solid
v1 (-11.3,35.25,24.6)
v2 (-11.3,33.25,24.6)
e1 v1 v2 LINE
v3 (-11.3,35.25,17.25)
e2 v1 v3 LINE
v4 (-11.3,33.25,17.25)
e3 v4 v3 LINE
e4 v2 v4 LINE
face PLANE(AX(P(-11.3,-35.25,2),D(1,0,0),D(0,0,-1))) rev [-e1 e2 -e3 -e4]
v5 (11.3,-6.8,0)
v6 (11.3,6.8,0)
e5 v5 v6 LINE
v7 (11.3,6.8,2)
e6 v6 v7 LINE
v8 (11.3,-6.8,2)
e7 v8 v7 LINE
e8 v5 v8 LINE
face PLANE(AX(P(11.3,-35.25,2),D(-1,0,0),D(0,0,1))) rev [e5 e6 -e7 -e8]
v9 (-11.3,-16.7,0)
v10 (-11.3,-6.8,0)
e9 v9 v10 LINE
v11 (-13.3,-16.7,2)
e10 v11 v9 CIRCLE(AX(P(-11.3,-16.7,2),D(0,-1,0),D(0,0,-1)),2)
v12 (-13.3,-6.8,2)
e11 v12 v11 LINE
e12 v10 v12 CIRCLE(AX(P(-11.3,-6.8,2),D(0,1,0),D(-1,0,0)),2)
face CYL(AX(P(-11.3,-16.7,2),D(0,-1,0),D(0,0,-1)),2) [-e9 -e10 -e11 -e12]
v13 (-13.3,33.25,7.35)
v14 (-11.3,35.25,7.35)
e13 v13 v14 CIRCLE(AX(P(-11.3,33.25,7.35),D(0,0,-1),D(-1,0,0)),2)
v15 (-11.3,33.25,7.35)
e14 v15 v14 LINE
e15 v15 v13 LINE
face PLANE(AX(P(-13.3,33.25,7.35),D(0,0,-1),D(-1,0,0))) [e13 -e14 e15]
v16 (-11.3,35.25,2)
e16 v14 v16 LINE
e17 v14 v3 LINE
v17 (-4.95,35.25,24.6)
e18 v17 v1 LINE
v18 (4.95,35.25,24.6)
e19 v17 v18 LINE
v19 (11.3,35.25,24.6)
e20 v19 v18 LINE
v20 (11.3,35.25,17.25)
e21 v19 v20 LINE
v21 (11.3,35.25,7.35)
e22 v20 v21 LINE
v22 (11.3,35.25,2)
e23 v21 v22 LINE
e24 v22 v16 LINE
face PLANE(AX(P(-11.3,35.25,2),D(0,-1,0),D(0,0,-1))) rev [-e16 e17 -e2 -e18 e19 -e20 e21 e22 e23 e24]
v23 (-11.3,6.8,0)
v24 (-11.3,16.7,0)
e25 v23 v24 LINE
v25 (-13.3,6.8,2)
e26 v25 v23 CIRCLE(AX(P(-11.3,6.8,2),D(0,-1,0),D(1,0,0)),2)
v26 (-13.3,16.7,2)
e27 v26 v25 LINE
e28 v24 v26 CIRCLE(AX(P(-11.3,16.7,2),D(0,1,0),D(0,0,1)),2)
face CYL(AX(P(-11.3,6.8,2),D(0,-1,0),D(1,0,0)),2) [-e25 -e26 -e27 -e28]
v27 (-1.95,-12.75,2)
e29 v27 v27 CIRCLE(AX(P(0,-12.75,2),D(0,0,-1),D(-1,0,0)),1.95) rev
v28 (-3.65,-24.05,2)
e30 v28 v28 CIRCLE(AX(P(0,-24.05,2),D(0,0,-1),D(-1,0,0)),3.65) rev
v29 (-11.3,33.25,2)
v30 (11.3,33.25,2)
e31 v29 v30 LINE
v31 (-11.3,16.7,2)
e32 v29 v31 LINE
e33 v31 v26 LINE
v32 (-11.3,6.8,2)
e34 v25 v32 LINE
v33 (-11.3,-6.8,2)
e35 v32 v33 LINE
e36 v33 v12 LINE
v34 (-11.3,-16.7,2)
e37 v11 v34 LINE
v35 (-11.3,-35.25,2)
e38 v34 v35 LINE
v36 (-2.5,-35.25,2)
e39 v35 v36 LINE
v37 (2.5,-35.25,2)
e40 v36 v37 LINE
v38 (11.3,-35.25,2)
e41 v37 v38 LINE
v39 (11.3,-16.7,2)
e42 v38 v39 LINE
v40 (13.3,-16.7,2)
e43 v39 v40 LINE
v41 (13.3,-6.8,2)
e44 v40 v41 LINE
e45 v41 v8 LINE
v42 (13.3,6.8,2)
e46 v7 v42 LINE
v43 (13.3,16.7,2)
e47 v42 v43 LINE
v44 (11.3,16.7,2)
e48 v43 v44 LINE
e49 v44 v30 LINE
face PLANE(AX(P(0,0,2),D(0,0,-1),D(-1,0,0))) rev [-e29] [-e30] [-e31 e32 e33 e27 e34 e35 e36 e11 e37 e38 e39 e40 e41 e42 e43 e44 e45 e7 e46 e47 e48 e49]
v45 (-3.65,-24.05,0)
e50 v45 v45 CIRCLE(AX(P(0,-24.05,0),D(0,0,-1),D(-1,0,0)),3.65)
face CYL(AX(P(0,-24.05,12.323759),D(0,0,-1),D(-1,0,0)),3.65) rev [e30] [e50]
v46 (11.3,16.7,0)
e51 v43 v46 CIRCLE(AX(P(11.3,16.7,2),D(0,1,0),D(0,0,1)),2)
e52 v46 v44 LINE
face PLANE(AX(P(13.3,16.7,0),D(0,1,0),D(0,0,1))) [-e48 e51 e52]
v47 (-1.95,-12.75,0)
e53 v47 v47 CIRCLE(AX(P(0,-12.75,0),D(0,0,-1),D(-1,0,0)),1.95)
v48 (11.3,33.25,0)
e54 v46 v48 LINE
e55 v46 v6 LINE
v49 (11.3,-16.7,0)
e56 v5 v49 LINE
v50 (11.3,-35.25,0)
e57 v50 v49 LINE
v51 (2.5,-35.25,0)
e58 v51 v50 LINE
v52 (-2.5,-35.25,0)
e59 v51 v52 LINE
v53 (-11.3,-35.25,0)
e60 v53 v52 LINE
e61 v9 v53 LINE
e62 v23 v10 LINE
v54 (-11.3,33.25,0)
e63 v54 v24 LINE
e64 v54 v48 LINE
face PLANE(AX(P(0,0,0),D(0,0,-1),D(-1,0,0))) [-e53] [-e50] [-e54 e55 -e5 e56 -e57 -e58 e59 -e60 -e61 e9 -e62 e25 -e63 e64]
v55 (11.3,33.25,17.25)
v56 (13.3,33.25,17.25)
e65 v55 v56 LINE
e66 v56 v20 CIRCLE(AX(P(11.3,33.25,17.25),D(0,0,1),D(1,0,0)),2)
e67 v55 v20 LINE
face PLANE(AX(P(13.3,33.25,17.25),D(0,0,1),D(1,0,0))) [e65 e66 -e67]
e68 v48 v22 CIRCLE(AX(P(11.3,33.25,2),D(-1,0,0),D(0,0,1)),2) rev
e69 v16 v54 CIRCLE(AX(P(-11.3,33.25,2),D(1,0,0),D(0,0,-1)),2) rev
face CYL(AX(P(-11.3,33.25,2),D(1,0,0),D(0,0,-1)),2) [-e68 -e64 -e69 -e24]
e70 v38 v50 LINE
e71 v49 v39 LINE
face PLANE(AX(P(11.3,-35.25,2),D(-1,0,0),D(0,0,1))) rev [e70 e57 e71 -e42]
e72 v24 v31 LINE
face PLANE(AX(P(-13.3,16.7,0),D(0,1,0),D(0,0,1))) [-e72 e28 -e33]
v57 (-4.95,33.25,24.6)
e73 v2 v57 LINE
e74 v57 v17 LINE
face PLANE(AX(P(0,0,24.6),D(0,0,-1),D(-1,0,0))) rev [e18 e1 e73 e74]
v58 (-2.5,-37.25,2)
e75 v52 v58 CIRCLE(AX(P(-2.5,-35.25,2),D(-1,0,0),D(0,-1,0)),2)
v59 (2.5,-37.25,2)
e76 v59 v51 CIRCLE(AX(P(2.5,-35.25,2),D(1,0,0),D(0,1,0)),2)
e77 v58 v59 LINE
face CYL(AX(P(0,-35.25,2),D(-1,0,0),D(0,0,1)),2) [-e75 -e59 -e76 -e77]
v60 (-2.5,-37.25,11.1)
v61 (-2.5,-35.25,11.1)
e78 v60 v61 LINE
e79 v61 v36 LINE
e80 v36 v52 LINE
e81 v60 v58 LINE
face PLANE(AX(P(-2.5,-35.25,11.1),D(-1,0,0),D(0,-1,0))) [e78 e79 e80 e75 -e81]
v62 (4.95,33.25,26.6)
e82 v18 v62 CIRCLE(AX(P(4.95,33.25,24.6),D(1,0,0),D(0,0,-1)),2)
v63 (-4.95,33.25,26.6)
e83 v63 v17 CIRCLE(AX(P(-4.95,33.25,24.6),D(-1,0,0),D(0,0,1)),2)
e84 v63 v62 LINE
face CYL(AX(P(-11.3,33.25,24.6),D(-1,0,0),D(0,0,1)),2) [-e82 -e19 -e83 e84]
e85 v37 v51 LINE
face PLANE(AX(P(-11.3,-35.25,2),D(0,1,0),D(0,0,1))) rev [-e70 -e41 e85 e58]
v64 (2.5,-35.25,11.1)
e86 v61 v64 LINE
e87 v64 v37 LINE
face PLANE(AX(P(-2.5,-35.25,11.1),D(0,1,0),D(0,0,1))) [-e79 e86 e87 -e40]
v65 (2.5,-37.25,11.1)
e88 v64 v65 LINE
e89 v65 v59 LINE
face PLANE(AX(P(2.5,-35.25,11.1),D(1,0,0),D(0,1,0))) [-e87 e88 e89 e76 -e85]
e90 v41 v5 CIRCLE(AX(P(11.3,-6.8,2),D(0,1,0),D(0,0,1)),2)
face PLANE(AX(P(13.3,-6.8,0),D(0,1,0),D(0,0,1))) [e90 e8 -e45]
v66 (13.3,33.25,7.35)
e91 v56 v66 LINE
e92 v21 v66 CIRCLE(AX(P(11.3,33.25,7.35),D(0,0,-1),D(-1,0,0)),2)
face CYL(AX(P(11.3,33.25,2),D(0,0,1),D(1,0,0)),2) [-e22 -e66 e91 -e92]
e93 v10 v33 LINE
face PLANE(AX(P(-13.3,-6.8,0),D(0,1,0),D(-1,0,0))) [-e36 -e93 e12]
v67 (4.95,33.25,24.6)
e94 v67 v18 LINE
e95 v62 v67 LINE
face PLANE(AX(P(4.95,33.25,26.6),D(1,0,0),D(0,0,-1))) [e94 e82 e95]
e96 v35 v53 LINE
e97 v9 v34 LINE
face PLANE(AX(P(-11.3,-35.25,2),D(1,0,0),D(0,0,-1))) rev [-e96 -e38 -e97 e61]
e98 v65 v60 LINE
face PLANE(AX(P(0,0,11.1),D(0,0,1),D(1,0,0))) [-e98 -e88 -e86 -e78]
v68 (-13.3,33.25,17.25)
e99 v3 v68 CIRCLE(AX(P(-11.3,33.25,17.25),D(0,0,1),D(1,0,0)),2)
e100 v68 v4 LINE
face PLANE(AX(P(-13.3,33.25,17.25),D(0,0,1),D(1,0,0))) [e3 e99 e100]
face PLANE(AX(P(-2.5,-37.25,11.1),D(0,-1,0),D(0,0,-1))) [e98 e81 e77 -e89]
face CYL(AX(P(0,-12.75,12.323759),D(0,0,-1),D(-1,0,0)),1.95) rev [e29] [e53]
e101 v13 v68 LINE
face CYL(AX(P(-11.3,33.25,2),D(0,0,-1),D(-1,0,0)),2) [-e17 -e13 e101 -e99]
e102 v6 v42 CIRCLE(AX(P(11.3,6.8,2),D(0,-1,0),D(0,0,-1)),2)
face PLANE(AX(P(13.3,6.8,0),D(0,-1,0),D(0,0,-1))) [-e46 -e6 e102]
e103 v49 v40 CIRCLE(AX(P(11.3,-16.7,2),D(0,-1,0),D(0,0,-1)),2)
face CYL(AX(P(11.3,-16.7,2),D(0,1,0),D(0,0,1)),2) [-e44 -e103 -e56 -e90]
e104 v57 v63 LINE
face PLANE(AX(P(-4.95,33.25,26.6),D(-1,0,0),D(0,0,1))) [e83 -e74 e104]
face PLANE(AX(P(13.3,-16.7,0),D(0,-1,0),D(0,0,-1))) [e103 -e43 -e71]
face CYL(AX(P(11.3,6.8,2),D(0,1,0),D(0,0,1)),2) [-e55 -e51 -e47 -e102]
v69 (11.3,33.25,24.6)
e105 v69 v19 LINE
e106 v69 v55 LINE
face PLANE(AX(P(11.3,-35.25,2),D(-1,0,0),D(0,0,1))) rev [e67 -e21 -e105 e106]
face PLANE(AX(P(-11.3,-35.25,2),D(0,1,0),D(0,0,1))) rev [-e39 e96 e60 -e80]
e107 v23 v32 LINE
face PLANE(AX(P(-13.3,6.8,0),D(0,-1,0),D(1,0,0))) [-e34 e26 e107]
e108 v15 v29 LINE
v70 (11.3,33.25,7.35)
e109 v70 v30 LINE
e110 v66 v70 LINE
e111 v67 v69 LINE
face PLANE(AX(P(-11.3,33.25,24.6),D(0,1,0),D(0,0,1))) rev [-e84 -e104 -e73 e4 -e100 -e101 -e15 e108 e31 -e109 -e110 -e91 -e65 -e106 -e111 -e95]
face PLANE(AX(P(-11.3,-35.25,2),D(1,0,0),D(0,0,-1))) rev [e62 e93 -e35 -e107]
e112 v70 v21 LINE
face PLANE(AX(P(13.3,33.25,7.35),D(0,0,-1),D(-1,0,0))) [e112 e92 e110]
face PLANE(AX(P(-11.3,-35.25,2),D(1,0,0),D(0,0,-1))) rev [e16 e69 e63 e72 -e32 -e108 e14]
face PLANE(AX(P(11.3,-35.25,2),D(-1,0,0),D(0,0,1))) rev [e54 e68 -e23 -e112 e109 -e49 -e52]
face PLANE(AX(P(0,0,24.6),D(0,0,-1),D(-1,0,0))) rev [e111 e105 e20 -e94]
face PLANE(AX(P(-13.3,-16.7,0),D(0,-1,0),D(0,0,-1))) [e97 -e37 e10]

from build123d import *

# Parameters (mm, degrees)
SKETCH1_W           = 22.6
SKETCH1_H           = 70.5
BOSS_EXTRUDE1_DEPTH = 2
SKETCH2_W           = 22.6
SKETCH2_H           = 2
BOSS_EXTRUDE2_DEPTH = 22.6
SKETCH3_W           = 2
SKETCH3_H           = 9.9
SKETCH3_W_2         = 9.9
SKETCH3_H_2         = 2
BOSS_EXTRUDE3_DEPTH = 2
SKETCH4_W           = 2
SKETCH4_H           = 9.9
BOSS_EXTRUDE4_DEPTH = 2
FILLET1_R           = 2
SKETCH5_W           = 5
SKETCH5_H           = 2
BOSS_EXTRUDE5_DEPTH = 11.1
FILLET2_R           = 2
SKETCH6_R           = 3.65
SKETCH6_R_2         = 1.95
CUT_EXTRUDE1_DEPTH  = 2


with BuildPart() as part:
    # Sketch1 → Boss-Extrude1 (new body)
    with BuildSketch(Plane.XY):
        Rectangle(SKETCH1_W, SKETCH1_H)
    extrude(amount=BOSS_EXTRUDE1_DEPTH)

    # Sketch2 → Boss-Extrude2 (add)
    with BuildSketch(Plane.XY.offset(2)):
        with Locations((0, 34.25)):
            Rectangle(SKETCH2_W, SKETCH2_H)
    extrude(amount=BOSS_EXTRUDE2_DEPTH)

    # Sketch3 → Boss-Extrude3 (add)
    with BuildSketch(Plane(origin=(0, 35.25, 0), x_dir=(1, 0, 0), z_dir=(0, 1, 0))):
        with Locations((-12.3, -12.3)):
            Rectangle(SKETCH3_W, SKETCH3_H)
        with Locations((12.3, -12.3)):
            Rectangle(SKETCH3_W, SKETCH3_H)
        with Locations((0, -25.6)):
            Rectangle(SKETCH3_W_2, SKETCH3_H_2)
    extrude(amount=-BOSS_EXTRUDE3_DEPTH)

    # Sketch4 → Boss-Extrude4 (add)
    with BuildSketch(Plane.XY.offset(2)):
        with Locations((12.3, 11.75)):
            Rectangle(SKETCH4_W, SKETCH4_H)
        with Locations((12.3, -11.75)):
            Rectangle(SKETCH4_W, SKETCH4_H)
        with Locations((-12.3, -11.75)):
            Rectangle(SKETCH4_W, SKETCH4_H)
        with Locations((-12.3, 11.75)):
            Rectangle(SKETCH4_W, SKETCH4_H)
    extrude(amount=-BOSS_EXTRUDE4_DEPTH)

    # Fillet1
    # the kernel refuses this fillet: 2 mm, written as the material it takes off along each edge
    with BuildSketch(Plane(origin=(16.3, 35.25, 0), x_dir=(0, -1, 0), z_dir=(-1, 0, 0))) as fillet1_piece_1:
        with BuildLine():
            CenterArc((FILLET1_R, FILLET1_R), FILLET1_R, 180, 90)
            Line((0, FILLET1_R), (0, 0))
            Line((0, 0), (FILLET1_R, 0))
        make_face()
    extrude(amount=32.6, mode=Mode.SUBTRACT)
    with BuildSketch(Plane(origin=(13.3, 35.25, 2.35), x_dir=(-1, 0, 0), z_dir=(0, 0, 1)), Plane(origin=(9.95, 35.25, 26.6), x_dir=(0, 0, -1), z_dir=(-1, 0, 0)), Plane(origin=(-13.3, 35.25, 22.25), x_dir=(1, 0, 0), z_dir=(0, 0, -1)), Plane(origin=(13.3, 1.8, 0), x_dir=(-1, 0, 0), z_dir=(0, 1, 0)), Plane(origin=(13.3, -21.7, 0), x_dir=(-1, 0, 0), z_dir=(0, 1, 0))) as fillet1_piece_2:
        with BuildLine():
            CenterArc((FILLET1_R, FILLET1_R), FILLET1_R, 180, 90)
            Line((0, FILLET1_R), (0, 0))
            Line((0, 0), (FILLET1_R, 0))
        make_face()
    extrude(amount=19.9, mode=Mode.SUBTRACT)
    with BuildSketch(Plane(origin=(-13.3, -21.7, 0), x_dir=(1, 0, 0), z_dir=(0, 1, 0)), Plane(origin=(-13.3, 1.8, 0), x_dir=(1, 0, 0), z_dir=(0, 1, 0))) as fillet1_piece_3:
        with BuildLine():
            CenterArc((FILLET1_R, -FILLET1_R), FILLET1_R, 90, 90)
            Line((0, -FILLET1_R), (0, 0))
            Line((0, 0), (FILLET1_R, 0))
        make_face()
    extrude(amount=19.9, mode=Mode.SUBTRACT)

    # Sketch5 → Boss-Extrude5 (add)
    with BuildSketch(Plane(origin=(0, 0, 0), x_dir=(-1, 0, 0), z_dir=(0, 0, -1))):
        with Locations((0, -36.25)):
            Rectangle(SKETCH5_W, SKETCH5_H)
    extrude(amount=-BOSS_EXTRUDE5_DEPTH)

    # Fillet2
    fillet2_edges = [part.edges().sort_by_distance(p)[0] for p in [
        (0, -37.25, 0),
    ]]
    fillet(fillet2_edges, radius=FILLET2_R)

    # Sketch6 → Cut-Extrude1 (cut)
    with BuildSketch(Plane(origin=(0, 0, 0), x_dir=(-1, 0, 0), z_dir=(0, 0, -1))):
        with Locations((0, -24.05)):
            Circle(SKETCH6_R)
        with Locations((0, -12.75)):
            Circle(SKETCH6_R_2)
    extrude(amount=-CUT_EXTRUDE1_DEPTH, mode=Mode.SUBTRACT)


solid = part.part
